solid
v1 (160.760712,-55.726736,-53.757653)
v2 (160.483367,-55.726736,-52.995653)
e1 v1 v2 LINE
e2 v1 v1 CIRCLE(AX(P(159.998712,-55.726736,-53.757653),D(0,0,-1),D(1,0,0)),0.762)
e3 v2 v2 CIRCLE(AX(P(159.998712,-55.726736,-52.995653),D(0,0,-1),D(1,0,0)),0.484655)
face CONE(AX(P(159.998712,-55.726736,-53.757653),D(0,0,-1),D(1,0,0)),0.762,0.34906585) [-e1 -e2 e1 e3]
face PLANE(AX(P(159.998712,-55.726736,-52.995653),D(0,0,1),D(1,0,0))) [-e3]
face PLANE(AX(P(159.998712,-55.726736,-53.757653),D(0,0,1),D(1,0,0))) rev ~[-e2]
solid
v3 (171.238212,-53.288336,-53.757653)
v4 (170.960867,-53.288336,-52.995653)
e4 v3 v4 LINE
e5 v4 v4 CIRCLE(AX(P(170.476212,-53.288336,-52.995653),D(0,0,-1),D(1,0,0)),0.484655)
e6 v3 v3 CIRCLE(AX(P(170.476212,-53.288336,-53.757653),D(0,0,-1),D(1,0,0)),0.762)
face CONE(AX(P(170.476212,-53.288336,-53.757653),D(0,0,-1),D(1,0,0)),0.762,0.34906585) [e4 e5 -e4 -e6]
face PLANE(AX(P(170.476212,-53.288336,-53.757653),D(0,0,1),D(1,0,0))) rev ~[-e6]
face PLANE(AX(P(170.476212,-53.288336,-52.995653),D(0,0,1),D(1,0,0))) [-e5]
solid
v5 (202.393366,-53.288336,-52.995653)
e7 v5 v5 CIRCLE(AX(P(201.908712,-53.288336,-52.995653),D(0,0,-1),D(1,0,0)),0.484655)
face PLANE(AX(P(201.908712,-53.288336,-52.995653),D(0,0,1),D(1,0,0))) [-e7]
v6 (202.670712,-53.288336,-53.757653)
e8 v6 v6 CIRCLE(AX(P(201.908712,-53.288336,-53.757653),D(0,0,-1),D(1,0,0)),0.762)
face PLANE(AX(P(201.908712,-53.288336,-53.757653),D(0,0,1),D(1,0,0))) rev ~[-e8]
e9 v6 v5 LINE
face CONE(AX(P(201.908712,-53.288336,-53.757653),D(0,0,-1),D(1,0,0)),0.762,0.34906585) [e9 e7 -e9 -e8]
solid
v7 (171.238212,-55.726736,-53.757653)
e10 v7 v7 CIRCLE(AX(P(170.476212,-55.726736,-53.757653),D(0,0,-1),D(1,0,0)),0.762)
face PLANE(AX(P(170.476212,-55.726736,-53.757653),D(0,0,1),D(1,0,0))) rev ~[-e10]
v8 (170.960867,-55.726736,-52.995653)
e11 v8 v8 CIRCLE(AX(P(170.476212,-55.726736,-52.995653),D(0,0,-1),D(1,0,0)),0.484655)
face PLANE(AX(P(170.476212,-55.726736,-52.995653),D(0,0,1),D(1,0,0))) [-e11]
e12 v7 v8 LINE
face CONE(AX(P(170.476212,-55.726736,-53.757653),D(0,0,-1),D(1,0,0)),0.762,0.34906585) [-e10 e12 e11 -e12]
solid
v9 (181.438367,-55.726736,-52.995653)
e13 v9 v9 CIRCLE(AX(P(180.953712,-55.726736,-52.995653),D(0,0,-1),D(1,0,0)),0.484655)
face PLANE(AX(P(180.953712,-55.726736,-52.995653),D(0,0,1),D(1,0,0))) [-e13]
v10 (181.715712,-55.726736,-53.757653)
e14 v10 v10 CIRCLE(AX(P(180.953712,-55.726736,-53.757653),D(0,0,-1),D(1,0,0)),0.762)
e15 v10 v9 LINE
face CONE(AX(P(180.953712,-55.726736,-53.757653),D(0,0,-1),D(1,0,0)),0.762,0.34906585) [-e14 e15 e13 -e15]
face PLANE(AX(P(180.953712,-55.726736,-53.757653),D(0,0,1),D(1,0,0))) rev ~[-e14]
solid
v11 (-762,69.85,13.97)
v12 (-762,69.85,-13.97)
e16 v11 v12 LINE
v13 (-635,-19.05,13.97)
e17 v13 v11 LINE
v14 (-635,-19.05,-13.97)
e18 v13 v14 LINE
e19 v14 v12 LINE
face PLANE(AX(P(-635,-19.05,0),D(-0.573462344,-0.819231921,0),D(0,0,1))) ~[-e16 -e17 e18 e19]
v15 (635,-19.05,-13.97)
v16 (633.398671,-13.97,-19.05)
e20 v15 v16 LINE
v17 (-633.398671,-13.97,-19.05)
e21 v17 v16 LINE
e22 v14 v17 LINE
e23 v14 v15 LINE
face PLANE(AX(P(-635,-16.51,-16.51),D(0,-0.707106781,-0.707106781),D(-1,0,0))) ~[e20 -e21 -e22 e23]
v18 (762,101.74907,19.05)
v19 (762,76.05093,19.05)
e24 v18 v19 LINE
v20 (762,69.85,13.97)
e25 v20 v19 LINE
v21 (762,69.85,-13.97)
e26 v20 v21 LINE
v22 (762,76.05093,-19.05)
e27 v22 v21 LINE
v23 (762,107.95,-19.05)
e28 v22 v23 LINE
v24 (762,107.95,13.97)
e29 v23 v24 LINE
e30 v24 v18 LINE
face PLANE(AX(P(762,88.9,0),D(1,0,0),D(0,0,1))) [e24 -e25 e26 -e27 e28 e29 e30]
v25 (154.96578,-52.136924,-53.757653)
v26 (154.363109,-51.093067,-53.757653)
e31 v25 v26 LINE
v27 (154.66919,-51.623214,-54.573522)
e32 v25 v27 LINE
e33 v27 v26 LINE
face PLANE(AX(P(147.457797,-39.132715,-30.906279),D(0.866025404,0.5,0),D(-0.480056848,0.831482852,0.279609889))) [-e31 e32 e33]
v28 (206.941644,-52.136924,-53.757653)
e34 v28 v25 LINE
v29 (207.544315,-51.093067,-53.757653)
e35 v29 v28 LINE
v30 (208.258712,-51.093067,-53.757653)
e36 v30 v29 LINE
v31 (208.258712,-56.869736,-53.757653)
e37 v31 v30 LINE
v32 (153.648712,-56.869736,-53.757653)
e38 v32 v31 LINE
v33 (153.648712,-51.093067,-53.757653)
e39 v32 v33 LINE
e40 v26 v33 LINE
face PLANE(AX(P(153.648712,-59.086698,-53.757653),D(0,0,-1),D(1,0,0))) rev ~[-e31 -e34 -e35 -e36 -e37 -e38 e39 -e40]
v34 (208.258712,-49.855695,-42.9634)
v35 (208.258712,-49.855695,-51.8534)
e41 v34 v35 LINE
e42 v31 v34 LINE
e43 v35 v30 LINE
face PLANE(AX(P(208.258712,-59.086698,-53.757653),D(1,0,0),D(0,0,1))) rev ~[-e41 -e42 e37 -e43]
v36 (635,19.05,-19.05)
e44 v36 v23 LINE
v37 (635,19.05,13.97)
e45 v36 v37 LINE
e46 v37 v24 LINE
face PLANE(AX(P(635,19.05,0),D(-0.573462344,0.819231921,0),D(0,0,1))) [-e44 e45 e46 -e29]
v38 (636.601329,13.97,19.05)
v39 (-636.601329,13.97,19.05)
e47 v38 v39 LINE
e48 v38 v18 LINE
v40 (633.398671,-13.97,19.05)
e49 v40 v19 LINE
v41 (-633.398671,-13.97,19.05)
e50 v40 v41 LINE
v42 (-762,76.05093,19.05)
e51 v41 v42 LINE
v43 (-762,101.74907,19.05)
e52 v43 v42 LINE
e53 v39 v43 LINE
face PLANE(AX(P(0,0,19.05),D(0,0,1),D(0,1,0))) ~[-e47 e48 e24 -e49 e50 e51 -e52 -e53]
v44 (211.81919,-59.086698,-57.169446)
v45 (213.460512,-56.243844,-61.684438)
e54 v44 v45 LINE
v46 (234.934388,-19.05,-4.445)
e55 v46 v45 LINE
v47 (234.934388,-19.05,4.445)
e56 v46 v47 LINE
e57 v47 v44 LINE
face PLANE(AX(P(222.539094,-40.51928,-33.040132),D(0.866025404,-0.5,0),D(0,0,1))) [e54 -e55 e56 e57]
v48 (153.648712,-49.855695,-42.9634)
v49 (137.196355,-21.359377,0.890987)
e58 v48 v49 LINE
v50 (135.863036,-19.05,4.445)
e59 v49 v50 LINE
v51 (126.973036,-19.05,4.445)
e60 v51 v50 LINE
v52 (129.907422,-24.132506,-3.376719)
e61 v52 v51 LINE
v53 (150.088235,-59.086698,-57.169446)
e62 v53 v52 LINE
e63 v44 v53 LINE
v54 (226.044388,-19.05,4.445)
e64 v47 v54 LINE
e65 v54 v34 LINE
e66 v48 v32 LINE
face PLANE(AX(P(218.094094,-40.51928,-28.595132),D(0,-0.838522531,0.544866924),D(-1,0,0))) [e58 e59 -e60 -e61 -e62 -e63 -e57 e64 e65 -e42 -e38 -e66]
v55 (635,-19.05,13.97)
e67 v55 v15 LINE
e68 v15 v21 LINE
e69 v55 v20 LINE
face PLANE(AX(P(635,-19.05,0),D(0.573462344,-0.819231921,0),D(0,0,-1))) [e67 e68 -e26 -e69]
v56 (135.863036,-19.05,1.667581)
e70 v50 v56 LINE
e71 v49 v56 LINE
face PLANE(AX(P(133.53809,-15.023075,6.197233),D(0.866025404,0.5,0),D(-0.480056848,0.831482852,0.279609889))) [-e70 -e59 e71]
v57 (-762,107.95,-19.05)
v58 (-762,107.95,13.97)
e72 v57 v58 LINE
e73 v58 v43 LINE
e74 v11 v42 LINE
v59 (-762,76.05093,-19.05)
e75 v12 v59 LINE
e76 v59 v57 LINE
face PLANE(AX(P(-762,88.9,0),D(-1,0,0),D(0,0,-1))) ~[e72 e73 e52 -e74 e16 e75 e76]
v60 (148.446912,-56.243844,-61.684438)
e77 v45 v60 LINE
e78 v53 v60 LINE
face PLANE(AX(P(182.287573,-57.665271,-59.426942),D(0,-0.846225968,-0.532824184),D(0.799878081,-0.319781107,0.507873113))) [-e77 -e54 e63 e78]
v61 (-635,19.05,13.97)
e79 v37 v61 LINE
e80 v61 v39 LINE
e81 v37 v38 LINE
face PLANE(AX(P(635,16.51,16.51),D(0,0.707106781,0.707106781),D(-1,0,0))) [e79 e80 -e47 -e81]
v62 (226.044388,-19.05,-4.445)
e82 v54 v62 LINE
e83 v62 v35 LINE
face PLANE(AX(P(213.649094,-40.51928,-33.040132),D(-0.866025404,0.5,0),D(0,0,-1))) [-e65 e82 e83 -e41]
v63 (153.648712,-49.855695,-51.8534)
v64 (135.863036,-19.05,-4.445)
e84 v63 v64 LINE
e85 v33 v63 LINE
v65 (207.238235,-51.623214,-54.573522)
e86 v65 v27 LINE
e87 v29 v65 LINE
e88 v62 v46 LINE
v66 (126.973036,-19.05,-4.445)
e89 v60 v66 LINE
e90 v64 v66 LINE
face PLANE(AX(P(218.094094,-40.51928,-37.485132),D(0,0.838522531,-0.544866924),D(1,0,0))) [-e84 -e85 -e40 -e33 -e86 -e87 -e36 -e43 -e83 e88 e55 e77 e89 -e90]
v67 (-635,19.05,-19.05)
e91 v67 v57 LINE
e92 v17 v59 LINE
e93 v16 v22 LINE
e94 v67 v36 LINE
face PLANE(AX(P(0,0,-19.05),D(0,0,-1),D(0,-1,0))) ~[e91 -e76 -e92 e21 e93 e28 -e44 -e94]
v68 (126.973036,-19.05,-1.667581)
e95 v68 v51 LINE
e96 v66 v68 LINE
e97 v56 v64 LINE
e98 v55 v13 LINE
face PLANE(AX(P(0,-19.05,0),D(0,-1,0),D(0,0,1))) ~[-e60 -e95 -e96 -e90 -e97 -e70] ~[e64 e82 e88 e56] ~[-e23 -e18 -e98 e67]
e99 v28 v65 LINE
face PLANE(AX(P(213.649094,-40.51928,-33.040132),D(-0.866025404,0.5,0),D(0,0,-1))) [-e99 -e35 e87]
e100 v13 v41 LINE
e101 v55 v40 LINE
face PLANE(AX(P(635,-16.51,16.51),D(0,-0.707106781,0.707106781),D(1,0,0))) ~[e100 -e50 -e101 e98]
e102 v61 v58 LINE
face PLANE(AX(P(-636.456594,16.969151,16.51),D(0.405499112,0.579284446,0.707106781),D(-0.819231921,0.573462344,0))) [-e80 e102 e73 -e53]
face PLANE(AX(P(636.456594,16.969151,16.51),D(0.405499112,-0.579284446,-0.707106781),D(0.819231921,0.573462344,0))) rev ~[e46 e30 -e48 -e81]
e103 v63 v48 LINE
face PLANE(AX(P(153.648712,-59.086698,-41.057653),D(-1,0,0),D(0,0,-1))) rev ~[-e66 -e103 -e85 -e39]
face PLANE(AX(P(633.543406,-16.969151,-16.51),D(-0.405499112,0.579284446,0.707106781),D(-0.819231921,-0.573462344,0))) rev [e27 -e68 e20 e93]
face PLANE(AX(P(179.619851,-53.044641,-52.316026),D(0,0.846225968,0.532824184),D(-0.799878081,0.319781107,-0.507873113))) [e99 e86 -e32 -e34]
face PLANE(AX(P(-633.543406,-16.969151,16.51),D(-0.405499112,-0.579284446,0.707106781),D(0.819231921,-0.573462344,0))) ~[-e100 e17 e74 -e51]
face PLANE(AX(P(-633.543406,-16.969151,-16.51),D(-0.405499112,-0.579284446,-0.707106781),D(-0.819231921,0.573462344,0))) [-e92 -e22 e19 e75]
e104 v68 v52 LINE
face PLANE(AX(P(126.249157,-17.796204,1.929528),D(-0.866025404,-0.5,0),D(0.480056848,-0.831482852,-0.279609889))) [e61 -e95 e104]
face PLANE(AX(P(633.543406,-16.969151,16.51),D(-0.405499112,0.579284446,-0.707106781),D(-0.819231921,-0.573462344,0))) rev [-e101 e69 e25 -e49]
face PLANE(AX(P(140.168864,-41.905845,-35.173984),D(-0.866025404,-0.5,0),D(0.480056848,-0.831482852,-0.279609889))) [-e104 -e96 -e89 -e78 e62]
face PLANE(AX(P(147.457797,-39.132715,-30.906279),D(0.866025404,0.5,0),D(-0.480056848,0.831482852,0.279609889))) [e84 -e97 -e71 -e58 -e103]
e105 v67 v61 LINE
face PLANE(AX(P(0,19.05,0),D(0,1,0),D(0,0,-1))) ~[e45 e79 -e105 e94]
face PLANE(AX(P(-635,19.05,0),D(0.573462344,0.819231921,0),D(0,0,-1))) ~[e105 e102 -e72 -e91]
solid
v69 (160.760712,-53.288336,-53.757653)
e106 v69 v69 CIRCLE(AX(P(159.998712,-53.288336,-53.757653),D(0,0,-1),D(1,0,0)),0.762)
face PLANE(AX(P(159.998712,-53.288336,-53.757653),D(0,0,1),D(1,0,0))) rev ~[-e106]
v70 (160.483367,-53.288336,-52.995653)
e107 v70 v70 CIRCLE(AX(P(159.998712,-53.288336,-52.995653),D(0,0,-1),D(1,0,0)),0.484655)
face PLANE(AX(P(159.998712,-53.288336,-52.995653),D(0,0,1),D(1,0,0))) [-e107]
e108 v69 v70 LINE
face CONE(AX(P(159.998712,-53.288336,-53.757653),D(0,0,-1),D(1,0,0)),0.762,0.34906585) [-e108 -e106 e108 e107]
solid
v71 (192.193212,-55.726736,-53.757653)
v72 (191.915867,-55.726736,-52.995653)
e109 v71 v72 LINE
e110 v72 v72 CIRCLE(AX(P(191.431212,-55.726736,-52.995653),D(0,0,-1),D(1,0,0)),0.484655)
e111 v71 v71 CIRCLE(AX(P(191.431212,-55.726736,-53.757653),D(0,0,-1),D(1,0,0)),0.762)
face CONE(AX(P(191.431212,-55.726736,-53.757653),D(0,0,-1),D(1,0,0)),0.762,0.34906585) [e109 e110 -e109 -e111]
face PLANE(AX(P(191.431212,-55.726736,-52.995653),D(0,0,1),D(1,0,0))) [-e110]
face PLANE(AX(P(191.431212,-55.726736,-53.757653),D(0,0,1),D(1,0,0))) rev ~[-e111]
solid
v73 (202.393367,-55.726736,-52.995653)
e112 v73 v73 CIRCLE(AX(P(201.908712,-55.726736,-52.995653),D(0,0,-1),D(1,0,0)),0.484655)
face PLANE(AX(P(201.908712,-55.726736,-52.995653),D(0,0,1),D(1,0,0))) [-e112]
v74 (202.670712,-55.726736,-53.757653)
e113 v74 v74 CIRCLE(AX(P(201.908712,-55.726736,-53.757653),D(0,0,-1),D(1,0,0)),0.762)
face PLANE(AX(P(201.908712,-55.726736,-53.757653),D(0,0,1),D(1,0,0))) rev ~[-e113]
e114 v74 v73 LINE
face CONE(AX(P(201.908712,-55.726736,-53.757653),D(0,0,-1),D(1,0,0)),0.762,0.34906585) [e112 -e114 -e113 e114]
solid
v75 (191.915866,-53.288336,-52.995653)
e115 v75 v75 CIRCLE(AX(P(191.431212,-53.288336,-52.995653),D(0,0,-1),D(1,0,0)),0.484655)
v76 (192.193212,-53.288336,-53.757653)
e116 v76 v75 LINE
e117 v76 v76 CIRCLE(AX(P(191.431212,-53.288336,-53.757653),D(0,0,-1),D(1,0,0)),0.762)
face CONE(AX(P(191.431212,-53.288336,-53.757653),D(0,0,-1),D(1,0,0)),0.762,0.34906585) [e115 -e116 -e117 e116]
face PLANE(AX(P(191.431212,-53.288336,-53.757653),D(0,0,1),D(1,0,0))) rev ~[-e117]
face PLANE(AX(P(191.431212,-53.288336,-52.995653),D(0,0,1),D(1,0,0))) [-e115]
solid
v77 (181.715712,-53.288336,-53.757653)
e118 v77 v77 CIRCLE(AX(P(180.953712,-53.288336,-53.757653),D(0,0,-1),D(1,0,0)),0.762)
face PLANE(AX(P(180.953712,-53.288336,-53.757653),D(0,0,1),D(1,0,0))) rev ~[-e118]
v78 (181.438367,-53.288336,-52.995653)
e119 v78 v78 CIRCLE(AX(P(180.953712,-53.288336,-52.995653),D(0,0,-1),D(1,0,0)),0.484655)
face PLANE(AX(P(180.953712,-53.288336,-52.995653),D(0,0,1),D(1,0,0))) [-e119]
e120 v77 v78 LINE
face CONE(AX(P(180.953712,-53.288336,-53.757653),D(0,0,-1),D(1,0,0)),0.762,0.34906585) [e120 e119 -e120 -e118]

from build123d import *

# Parameters (mm, degrees)
F2_W      = 38.1
F2_H      = 38.1
F6_SIZE   = 5.08
F15_W     = 8.89
F15_H     = 8.89
F20_DEPTH = 76.2
F21_R     = 0.762
F22_DEPTH = 0.762
F22_TAPER = 20


with BuildPart() as f3:
    # F3: sweep along a path in F0
    with BuildLine(Plane.XY) as f3_path:
        Line((635, 0), (762, 88.9))
    # F2 (on plane+point) → F3 (sweep)
    with BuildSketch(Plane.YZ.offset(635)):
        Rectangle(F2_W, F2_H)
    sweep(path=f3_path.line)

    # F4: sweep along a path in F0
    with BuildLine(Plane.XY) as f4_path:
        Line((0, 0), (635, 0))
    # F2 (on plane+point) → F4 (sweep)
    with BuildSketch(Plane.YZ.offset(635)):
        Rectangle(F2_W, F2_H)
    sweep(path=f4_path.line)

    # F5: F3 across plane


with BuildPart() as f3_1:
    add(f3.part)
    add(f3.part.mirror(Plane.YZ))

    # F6
    f6_edges = [f3_1.edges().sort_by_distance(p)[0] for p in [
        (0, -19.05, 19.05),
        (-698.5, 25.4, 19.05),
        (-698.5, 63.5, 19.05),
        (0, 19.05, 19.05),
        (-698.5, 25.4, -19.05),
        (0, -19.05, -19.05),
        (698.5, 25.4, 19.05),
        (698.5, 63.5, 19.05),
        (698.5, 25.4, -19.05),
    ]]
    chamfer(f6_edges, length=F6_SIZE)

    # F17: sweep along a path in F17_path
    with BuildLine(Plane(origin=(230.4893882996, -19.05, 0), x_dir=(0, -0.5448669245, -0.8385225308), z_dir=(0, 0.8385225308, -0.5448669245))) as f17_path:
        Line((0, 0), (66.6308678854, 20.9606761542))
        Line((66.6308678854, 20.9606761542), (66.6308678854, 78.1106761542))
        Line((66.6308678854, 78.1106761542), (0, 99.0713523085))
        Line((0, 99.0713523085), (-9.6917626015, 102.1201779309))
    # F15 (on face) → F17 (sweep)
    with BuildSketch(Plane.XZ.offset(19.05)):
        with Locations((230.4893882996, 0)):
            Rectangle(F15_W, F15_H)
    sweep(path=f17_path.line, transition=Transition.RIGHT)

    # F19 (on face) → F20 (cut)
    with BuildSketch(Plane.XZ.offset(59.0866984684)):
        Polygon((180.9537121453, -41.0576526403), (153.6487121453, -41.0576526403), (153.6487121453, -53.7576526403), (180.9537121453, -53.7576526403), (208.2587121453, -53.7576526403), (208.2587121453, -41.0576526403), align=None)
    extrude(amount=-F20_DEPTH, mode=Mode.SUBTRACT)


with BuildPart() as f22:
    # F21 (on face) → F22 (new body)
    with BuildSketch(Plane.XY.offset(-53.7576526403)):
        with Locations((159.9987121453, -55.7267355194)):
            Circle(F21_R)
    extrude(amount=F22_DEPTH, taper=F22_TAPER)


with BuildPart() as f22b:
    # F21 (on face) → F22, piece 2 (new body)
    with BuildSketch(Plane.XY.offset(-53.7576526403)):
        with Locations((170.4762121453, -55.7267355194)):
            Circle(F21_R)
    extrude(amount=F22_DEPTH, taper=F22_TAPER)


with BuildPart() as f22c:
    # F21 (on face) → F22, piece 3 (new body)
    with BuildSketch(Plane.XY.offset(-53.7576526403)):
        with Locations((180.9537121453, -55.7267355194)):
            Circle(F21_R)
    extrude(amount=F22_DEPTH, taper=F22_TAPER)


with BuildPart() as f22d:
    # F21 (on face) → F22, piece 4 (new body)
    with BuildSketch(Plane.XY.offset(-53.7576526403)):
        with Locations((191.4312121453, -55.7267355194)):
            Circle(F21_R)
    extrude(amount=F22_DEPTH, taper=F22_TAPER)


with BuildPart() as f22e:
    # F21 (on face) → F22, piece 5 (new body)
    with BuildSketch(Plane.XY.offset(-53.7576526403)):
        with Locations((201.9087121453, -55.7267355194)):
            Circle(F21_R)
    extrude(amount=F22_DEPTH, taper=F22_TAPER)


with BuildPart() as f22f:
    # F21 (on face) → F22, piece 6 (new body)
    with BuildSketch(Plane.XY.offset(-53.7576526403)):
        with Locations((159.9987121453, -53.2883355194)):
            Circle(F21_R)
    extrude(amount=F22_DEPTH, taper=F22_TAPER)


with BuildPart() as f22g:
    # F21 (on face) → F22, piece 7 (new body)
    with BuildSketch(Plane.XY.offset(-53.7576526403)):
        with Locations((170.4762119939, -53.2883355194)):
            Circle(F21_R)
    extrude(amount=F22_DEPTH, taper=F22_TAPER)


with BuildPart() as f22h:
    # F21 (on face) → F22, piece 8 (new body)
    with BuildSketch(Plane.XY.offset(-53.7576526403)):
        with Locations((180.9537118425, -53.2883355194)):
            Circle(F21_R)
    extrude(amount=F22_DEPTH, taper=F22_TAPER)


with BuildPart() as f22i:
    # F21 (on face) → F22, piece 9 (new body)
    with BuildSketch(Plane.XY.offset(-53.7576526403)):
        with Locations((191.4312116911, -53.2883355194)):
            Circle(F21_R)
    extrude(amount=F22_DEPTH, taper=F22_TAPER)


with BuildPart() as f22j:
    # F21 (on face) → F22, piece 10 (new body)
    with BuildSketch(Plane.XY.offset(-53.7576526403)):
        with Locations((201.9087115398, -53.2883355194)):
            Circle(F21_R)
    extrude(amount=F22_DEPTH, taper=F22_TAPER)


solid = Compound([f3_1.part, f22.part, f22b.part, f22c.part, f22d.part, f22e.part, f22f.part, f22g.part, f22h.part, f22i.part, f22j.part])
